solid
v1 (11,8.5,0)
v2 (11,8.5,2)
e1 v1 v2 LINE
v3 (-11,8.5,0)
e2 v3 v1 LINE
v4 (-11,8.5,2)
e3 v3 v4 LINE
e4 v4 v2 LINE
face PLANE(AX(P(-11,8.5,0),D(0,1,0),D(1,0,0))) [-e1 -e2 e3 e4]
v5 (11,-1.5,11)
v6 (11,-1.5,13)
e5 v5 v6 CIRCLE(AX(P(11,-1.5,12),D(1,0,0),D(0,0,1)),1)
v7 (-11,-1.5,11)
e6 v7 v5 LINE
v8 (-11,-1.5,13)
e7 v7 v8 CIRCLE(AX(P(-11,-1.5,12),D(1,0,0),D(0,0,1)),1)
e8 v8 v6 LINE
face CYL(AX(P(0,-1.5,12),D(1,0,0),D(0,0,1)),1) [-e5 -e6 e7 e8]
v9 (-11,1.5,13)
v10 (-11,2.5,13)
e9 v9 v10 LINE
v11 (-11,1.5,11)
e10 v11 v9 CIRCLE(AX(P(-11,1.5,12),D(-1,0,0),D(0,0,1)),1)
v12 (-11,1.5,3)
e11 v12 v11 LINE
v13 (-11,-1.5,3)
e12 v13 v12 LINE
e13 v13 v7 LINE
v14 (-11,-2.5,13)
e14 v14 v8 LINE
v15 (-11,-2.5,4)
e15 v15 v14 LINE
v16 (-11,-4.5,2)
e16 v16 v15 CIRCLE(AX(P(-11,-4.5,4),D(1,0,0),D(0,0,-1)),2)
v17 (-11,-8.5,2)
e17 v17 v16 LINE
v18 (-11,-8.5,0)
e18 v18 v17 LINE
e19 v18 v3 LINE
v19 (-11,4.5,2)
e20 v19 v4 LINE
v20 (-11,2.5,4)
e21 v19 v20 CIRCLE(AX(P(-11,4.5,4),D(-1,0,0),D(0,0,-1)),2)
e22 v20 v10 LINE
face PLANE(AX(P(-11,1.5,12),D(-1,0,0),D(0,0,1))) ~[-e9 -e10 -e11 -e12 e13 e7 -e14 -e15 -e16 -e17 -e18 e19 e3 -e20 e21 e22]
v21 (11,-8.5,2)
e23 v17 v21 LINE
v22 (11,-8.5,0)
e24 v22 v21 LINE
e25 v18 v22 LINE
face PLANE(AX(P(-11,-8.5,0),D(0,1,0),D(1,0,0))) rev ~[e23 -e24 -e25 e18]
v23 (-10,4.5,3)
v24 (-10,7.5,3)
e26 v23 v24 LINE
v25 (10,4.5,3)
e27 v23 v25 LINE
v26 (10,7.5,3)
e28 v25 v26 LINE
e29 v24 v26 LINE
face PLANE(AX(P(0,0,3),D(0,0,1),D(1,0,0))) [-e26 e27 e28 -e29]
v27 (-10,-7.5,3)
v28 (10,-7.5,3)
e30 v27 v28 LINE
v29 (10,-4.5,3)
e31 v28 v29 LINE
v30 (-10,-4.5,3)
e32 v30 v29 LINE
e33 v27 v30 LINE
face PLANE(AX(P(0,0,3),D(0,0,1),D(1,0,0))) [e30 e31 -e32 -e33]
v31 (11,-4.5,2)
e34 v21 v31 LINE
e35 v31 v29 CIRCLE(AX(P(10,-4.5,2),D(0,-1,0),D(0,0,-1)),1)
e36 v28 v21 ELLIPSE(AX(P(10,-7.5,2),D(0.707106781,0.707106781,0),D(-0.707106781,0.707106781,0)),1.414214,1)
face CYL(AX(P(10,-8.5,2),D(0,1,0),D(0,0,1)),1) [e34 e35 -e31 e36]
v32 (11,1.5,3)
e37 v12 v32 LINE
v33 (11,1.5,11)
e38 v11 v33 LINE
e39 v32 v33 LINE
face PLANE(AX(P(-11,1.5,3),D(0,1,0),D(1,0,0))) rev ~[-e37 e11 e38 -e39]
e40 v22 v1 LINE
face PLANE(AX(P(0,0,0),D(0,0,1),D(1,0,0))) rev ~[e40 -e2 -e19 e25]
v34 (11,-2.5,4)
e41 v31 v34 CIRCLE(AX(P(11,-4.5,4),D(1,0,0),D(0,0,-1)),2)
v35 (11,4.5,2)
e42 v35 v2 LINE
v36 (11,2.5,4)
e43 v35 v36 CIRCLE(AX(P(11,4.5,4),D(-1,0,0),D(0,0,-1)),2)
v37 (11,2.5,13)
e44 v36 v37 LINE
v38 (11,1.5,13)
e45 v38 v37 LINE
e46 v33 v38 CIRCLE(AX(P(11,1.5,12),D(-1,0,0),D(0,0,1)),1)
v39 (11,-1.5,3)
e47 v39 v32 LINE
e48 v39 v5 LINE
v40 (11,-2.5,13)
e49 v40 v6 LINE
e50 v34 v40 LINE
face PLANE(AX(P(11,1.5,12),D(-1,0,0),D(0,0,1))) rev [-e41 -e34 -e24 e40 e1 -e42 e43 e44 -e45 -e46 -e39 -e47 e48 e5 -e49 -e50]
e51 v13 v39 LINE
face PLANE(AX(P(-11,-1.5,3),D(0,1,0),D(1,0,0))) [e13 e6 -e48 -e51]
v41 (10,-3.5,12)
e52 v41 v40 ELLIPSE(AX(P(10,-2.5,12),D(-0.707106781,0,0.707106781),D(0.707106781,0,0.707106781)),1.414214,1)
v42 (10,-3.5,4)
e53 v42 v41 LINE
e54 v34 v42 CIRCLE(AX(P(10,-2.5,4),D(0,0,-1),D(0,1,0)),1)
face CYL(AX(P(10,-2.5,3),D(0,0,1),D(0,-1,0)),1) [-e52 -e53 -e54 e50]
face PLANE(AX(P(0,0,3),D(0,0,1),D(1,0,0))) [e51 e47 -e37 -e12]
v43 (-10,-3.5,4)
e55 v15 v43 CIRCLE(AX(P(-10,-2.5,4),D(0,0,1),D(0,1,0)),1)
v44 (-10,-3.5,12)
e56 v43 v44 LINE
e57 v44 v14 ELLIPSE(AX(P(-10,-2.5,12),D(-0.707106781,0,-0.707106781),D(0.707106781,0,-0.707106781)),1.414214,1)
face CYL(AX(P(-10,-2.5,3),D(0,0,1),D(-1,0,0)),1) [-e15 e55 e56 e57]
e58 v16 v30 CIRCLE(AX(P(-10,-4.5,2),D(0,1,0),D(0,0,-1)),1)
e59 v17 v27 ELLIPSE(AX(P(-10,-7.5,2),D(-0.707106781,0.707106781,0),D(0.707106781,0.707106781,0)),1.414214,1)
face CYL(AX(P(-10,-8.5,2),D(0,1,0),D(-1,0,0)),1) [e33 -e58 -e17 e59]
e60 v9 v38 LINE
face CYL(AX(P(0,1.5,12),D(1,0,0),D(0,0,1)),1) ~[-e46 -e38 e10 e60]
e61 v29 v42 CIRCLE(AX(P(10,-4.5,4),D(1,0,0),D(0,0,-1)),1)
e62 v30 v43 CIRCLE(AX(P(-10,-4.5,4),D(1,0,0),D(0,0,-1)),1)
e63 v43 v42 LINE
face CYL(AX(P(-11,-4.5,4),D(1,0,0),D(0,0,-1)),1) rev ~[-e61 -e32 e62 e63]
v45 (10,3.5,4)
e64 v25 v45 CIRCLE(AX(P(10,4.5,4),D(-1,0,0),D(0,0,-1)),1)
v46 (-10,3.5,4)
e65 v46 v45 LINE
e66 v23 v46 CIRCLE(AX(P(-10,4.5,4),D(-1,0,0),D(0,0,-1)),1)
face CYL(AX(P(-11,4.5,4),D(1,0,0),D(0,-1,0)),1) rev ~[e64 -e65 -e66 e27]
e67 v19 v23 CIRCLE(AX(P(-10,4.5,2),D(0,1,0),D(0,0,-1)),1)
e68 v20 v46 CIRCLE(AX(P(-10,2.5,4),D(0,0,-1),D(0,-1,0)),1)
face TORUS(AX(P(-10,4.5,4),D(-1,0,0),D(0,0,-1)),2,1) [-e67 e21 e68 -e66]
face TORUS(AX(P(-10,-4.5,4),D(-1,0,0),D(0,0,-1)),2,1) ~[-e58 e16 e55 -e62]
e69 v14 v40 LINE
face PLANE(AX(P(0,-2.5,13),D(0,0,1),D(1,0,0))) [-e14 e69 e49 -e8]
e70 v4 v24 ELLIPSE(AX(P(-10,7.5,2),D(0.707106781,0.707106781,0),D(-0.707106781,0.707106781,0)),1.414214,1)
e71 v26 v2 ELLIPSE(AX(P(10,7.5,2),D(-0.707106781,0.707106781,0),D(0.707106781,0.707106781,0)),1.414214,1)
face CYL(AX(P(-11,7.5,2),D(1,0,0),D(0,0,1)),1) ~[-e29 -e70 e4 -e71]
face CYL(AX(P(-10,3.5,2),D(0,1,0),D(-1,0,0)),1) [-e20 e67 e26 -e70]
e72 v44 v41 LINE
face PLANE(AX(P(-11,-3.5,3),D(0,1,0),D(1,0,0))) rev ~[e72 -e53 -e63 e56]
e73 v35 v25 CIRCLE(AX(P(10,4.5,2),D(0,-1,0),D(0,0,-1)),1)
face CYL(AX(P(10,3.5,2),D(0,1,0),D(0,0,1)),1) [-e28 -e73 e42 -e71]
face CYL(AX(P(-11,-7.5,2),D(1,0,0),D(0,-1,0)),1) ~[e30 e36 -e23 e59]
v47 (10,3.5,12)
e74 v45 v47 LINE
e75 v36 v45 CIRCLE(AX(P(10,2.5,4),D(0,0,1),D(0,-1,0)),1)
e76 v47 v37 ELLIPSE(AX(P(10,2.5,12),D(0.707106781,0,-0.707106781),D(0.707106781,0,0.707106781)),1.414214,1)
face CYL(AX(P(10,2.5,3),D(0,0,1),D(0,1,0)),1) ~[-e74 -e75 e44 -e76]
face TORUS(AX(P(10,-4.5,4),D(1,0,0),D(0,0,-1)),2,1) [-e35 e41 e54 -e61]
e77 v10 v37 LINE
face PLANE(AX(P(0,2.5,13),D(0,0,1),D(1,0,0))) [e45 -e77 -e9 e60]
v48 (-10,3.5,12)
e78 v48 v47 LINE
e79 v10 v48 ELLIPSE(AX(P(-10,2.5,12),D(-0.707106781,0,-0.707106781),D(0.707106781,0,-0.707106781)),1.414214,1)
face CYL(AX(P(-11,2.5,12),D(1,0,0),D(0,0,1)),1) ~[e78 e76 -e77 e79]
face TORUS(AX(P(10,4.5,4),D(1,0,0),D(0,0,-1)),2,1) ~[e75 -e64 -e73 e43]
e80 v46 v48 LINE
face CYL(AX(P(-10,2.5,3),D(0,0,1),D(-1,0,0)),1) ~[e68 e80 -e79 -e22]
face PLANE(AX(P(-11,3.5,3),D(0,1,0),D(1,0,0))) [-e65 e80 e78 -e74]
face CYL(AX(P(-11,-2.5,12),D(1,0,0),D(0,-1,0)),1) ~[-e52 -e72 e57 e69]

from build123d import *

# Parameters (mm, degrees)
F0_W     = 22
F0_H     = 17
F1_DEPTH = 3
F2_W     = 22
F2_H     = 2
F3_DEPTH = 10
F4_W     = 22
F4_H     = 1
F7_R     = 1


with BuildPart() as f1:
    # F0 (on Top) → F1 (new body)
    with BuildSketch(Plane.XY):
        Rectangle(F0_W, F0_H)
    extrude(amount=F1_DEPTH)

    # F2 (on face) → F3 (join)
    with BuildSketch(Plane.XY.offset(3)):
        with Locations((0, 2.5)):
            Rectangle(F2_W, F2_H)
        with Locations((0, -2.5)):
            Rectangle(F2_W, F2_H)
    extrude(amount=F3_DEPTH)

    # F4 (on face) → F5 (revolve)
    with BuildSketch(Plane.XZ.offset(-1.5)):
        with Locations((0, 12.5)):
            Rectangle(F4_W, F4_H)
    revolve(axis=Axis((0, 1.5, 12), (-1, 0, 0)))

    # F6: F1 across plane


with BuildPart() as f1_1:
    add(f1.part)
    add(f1.part.mirror(Plane.XZ))

    # F7
    f7_edges = [f1_1.edges().sort_by_distance(p)[0] for p in [
        (0, -3.5, 3),
        (0, -3.5, 13),
        (11, 3.5, 8),
        (11, -6, 3),
        (0, -8.5, 3),
        (-11, -6, 3),
        (0, 3.5, 13),
        (0, 3.5, 3),
        (-11, 6, 3),
        (11, 6, 3),
        (0, 8.5, 3),
        (-11, 3.5, 8),
        (-11, -3.5, 8),
        (11, -3.5, 8),
    ]]
    fillet(f7_edges, radius=F7_R)


solid = f1_1.part
